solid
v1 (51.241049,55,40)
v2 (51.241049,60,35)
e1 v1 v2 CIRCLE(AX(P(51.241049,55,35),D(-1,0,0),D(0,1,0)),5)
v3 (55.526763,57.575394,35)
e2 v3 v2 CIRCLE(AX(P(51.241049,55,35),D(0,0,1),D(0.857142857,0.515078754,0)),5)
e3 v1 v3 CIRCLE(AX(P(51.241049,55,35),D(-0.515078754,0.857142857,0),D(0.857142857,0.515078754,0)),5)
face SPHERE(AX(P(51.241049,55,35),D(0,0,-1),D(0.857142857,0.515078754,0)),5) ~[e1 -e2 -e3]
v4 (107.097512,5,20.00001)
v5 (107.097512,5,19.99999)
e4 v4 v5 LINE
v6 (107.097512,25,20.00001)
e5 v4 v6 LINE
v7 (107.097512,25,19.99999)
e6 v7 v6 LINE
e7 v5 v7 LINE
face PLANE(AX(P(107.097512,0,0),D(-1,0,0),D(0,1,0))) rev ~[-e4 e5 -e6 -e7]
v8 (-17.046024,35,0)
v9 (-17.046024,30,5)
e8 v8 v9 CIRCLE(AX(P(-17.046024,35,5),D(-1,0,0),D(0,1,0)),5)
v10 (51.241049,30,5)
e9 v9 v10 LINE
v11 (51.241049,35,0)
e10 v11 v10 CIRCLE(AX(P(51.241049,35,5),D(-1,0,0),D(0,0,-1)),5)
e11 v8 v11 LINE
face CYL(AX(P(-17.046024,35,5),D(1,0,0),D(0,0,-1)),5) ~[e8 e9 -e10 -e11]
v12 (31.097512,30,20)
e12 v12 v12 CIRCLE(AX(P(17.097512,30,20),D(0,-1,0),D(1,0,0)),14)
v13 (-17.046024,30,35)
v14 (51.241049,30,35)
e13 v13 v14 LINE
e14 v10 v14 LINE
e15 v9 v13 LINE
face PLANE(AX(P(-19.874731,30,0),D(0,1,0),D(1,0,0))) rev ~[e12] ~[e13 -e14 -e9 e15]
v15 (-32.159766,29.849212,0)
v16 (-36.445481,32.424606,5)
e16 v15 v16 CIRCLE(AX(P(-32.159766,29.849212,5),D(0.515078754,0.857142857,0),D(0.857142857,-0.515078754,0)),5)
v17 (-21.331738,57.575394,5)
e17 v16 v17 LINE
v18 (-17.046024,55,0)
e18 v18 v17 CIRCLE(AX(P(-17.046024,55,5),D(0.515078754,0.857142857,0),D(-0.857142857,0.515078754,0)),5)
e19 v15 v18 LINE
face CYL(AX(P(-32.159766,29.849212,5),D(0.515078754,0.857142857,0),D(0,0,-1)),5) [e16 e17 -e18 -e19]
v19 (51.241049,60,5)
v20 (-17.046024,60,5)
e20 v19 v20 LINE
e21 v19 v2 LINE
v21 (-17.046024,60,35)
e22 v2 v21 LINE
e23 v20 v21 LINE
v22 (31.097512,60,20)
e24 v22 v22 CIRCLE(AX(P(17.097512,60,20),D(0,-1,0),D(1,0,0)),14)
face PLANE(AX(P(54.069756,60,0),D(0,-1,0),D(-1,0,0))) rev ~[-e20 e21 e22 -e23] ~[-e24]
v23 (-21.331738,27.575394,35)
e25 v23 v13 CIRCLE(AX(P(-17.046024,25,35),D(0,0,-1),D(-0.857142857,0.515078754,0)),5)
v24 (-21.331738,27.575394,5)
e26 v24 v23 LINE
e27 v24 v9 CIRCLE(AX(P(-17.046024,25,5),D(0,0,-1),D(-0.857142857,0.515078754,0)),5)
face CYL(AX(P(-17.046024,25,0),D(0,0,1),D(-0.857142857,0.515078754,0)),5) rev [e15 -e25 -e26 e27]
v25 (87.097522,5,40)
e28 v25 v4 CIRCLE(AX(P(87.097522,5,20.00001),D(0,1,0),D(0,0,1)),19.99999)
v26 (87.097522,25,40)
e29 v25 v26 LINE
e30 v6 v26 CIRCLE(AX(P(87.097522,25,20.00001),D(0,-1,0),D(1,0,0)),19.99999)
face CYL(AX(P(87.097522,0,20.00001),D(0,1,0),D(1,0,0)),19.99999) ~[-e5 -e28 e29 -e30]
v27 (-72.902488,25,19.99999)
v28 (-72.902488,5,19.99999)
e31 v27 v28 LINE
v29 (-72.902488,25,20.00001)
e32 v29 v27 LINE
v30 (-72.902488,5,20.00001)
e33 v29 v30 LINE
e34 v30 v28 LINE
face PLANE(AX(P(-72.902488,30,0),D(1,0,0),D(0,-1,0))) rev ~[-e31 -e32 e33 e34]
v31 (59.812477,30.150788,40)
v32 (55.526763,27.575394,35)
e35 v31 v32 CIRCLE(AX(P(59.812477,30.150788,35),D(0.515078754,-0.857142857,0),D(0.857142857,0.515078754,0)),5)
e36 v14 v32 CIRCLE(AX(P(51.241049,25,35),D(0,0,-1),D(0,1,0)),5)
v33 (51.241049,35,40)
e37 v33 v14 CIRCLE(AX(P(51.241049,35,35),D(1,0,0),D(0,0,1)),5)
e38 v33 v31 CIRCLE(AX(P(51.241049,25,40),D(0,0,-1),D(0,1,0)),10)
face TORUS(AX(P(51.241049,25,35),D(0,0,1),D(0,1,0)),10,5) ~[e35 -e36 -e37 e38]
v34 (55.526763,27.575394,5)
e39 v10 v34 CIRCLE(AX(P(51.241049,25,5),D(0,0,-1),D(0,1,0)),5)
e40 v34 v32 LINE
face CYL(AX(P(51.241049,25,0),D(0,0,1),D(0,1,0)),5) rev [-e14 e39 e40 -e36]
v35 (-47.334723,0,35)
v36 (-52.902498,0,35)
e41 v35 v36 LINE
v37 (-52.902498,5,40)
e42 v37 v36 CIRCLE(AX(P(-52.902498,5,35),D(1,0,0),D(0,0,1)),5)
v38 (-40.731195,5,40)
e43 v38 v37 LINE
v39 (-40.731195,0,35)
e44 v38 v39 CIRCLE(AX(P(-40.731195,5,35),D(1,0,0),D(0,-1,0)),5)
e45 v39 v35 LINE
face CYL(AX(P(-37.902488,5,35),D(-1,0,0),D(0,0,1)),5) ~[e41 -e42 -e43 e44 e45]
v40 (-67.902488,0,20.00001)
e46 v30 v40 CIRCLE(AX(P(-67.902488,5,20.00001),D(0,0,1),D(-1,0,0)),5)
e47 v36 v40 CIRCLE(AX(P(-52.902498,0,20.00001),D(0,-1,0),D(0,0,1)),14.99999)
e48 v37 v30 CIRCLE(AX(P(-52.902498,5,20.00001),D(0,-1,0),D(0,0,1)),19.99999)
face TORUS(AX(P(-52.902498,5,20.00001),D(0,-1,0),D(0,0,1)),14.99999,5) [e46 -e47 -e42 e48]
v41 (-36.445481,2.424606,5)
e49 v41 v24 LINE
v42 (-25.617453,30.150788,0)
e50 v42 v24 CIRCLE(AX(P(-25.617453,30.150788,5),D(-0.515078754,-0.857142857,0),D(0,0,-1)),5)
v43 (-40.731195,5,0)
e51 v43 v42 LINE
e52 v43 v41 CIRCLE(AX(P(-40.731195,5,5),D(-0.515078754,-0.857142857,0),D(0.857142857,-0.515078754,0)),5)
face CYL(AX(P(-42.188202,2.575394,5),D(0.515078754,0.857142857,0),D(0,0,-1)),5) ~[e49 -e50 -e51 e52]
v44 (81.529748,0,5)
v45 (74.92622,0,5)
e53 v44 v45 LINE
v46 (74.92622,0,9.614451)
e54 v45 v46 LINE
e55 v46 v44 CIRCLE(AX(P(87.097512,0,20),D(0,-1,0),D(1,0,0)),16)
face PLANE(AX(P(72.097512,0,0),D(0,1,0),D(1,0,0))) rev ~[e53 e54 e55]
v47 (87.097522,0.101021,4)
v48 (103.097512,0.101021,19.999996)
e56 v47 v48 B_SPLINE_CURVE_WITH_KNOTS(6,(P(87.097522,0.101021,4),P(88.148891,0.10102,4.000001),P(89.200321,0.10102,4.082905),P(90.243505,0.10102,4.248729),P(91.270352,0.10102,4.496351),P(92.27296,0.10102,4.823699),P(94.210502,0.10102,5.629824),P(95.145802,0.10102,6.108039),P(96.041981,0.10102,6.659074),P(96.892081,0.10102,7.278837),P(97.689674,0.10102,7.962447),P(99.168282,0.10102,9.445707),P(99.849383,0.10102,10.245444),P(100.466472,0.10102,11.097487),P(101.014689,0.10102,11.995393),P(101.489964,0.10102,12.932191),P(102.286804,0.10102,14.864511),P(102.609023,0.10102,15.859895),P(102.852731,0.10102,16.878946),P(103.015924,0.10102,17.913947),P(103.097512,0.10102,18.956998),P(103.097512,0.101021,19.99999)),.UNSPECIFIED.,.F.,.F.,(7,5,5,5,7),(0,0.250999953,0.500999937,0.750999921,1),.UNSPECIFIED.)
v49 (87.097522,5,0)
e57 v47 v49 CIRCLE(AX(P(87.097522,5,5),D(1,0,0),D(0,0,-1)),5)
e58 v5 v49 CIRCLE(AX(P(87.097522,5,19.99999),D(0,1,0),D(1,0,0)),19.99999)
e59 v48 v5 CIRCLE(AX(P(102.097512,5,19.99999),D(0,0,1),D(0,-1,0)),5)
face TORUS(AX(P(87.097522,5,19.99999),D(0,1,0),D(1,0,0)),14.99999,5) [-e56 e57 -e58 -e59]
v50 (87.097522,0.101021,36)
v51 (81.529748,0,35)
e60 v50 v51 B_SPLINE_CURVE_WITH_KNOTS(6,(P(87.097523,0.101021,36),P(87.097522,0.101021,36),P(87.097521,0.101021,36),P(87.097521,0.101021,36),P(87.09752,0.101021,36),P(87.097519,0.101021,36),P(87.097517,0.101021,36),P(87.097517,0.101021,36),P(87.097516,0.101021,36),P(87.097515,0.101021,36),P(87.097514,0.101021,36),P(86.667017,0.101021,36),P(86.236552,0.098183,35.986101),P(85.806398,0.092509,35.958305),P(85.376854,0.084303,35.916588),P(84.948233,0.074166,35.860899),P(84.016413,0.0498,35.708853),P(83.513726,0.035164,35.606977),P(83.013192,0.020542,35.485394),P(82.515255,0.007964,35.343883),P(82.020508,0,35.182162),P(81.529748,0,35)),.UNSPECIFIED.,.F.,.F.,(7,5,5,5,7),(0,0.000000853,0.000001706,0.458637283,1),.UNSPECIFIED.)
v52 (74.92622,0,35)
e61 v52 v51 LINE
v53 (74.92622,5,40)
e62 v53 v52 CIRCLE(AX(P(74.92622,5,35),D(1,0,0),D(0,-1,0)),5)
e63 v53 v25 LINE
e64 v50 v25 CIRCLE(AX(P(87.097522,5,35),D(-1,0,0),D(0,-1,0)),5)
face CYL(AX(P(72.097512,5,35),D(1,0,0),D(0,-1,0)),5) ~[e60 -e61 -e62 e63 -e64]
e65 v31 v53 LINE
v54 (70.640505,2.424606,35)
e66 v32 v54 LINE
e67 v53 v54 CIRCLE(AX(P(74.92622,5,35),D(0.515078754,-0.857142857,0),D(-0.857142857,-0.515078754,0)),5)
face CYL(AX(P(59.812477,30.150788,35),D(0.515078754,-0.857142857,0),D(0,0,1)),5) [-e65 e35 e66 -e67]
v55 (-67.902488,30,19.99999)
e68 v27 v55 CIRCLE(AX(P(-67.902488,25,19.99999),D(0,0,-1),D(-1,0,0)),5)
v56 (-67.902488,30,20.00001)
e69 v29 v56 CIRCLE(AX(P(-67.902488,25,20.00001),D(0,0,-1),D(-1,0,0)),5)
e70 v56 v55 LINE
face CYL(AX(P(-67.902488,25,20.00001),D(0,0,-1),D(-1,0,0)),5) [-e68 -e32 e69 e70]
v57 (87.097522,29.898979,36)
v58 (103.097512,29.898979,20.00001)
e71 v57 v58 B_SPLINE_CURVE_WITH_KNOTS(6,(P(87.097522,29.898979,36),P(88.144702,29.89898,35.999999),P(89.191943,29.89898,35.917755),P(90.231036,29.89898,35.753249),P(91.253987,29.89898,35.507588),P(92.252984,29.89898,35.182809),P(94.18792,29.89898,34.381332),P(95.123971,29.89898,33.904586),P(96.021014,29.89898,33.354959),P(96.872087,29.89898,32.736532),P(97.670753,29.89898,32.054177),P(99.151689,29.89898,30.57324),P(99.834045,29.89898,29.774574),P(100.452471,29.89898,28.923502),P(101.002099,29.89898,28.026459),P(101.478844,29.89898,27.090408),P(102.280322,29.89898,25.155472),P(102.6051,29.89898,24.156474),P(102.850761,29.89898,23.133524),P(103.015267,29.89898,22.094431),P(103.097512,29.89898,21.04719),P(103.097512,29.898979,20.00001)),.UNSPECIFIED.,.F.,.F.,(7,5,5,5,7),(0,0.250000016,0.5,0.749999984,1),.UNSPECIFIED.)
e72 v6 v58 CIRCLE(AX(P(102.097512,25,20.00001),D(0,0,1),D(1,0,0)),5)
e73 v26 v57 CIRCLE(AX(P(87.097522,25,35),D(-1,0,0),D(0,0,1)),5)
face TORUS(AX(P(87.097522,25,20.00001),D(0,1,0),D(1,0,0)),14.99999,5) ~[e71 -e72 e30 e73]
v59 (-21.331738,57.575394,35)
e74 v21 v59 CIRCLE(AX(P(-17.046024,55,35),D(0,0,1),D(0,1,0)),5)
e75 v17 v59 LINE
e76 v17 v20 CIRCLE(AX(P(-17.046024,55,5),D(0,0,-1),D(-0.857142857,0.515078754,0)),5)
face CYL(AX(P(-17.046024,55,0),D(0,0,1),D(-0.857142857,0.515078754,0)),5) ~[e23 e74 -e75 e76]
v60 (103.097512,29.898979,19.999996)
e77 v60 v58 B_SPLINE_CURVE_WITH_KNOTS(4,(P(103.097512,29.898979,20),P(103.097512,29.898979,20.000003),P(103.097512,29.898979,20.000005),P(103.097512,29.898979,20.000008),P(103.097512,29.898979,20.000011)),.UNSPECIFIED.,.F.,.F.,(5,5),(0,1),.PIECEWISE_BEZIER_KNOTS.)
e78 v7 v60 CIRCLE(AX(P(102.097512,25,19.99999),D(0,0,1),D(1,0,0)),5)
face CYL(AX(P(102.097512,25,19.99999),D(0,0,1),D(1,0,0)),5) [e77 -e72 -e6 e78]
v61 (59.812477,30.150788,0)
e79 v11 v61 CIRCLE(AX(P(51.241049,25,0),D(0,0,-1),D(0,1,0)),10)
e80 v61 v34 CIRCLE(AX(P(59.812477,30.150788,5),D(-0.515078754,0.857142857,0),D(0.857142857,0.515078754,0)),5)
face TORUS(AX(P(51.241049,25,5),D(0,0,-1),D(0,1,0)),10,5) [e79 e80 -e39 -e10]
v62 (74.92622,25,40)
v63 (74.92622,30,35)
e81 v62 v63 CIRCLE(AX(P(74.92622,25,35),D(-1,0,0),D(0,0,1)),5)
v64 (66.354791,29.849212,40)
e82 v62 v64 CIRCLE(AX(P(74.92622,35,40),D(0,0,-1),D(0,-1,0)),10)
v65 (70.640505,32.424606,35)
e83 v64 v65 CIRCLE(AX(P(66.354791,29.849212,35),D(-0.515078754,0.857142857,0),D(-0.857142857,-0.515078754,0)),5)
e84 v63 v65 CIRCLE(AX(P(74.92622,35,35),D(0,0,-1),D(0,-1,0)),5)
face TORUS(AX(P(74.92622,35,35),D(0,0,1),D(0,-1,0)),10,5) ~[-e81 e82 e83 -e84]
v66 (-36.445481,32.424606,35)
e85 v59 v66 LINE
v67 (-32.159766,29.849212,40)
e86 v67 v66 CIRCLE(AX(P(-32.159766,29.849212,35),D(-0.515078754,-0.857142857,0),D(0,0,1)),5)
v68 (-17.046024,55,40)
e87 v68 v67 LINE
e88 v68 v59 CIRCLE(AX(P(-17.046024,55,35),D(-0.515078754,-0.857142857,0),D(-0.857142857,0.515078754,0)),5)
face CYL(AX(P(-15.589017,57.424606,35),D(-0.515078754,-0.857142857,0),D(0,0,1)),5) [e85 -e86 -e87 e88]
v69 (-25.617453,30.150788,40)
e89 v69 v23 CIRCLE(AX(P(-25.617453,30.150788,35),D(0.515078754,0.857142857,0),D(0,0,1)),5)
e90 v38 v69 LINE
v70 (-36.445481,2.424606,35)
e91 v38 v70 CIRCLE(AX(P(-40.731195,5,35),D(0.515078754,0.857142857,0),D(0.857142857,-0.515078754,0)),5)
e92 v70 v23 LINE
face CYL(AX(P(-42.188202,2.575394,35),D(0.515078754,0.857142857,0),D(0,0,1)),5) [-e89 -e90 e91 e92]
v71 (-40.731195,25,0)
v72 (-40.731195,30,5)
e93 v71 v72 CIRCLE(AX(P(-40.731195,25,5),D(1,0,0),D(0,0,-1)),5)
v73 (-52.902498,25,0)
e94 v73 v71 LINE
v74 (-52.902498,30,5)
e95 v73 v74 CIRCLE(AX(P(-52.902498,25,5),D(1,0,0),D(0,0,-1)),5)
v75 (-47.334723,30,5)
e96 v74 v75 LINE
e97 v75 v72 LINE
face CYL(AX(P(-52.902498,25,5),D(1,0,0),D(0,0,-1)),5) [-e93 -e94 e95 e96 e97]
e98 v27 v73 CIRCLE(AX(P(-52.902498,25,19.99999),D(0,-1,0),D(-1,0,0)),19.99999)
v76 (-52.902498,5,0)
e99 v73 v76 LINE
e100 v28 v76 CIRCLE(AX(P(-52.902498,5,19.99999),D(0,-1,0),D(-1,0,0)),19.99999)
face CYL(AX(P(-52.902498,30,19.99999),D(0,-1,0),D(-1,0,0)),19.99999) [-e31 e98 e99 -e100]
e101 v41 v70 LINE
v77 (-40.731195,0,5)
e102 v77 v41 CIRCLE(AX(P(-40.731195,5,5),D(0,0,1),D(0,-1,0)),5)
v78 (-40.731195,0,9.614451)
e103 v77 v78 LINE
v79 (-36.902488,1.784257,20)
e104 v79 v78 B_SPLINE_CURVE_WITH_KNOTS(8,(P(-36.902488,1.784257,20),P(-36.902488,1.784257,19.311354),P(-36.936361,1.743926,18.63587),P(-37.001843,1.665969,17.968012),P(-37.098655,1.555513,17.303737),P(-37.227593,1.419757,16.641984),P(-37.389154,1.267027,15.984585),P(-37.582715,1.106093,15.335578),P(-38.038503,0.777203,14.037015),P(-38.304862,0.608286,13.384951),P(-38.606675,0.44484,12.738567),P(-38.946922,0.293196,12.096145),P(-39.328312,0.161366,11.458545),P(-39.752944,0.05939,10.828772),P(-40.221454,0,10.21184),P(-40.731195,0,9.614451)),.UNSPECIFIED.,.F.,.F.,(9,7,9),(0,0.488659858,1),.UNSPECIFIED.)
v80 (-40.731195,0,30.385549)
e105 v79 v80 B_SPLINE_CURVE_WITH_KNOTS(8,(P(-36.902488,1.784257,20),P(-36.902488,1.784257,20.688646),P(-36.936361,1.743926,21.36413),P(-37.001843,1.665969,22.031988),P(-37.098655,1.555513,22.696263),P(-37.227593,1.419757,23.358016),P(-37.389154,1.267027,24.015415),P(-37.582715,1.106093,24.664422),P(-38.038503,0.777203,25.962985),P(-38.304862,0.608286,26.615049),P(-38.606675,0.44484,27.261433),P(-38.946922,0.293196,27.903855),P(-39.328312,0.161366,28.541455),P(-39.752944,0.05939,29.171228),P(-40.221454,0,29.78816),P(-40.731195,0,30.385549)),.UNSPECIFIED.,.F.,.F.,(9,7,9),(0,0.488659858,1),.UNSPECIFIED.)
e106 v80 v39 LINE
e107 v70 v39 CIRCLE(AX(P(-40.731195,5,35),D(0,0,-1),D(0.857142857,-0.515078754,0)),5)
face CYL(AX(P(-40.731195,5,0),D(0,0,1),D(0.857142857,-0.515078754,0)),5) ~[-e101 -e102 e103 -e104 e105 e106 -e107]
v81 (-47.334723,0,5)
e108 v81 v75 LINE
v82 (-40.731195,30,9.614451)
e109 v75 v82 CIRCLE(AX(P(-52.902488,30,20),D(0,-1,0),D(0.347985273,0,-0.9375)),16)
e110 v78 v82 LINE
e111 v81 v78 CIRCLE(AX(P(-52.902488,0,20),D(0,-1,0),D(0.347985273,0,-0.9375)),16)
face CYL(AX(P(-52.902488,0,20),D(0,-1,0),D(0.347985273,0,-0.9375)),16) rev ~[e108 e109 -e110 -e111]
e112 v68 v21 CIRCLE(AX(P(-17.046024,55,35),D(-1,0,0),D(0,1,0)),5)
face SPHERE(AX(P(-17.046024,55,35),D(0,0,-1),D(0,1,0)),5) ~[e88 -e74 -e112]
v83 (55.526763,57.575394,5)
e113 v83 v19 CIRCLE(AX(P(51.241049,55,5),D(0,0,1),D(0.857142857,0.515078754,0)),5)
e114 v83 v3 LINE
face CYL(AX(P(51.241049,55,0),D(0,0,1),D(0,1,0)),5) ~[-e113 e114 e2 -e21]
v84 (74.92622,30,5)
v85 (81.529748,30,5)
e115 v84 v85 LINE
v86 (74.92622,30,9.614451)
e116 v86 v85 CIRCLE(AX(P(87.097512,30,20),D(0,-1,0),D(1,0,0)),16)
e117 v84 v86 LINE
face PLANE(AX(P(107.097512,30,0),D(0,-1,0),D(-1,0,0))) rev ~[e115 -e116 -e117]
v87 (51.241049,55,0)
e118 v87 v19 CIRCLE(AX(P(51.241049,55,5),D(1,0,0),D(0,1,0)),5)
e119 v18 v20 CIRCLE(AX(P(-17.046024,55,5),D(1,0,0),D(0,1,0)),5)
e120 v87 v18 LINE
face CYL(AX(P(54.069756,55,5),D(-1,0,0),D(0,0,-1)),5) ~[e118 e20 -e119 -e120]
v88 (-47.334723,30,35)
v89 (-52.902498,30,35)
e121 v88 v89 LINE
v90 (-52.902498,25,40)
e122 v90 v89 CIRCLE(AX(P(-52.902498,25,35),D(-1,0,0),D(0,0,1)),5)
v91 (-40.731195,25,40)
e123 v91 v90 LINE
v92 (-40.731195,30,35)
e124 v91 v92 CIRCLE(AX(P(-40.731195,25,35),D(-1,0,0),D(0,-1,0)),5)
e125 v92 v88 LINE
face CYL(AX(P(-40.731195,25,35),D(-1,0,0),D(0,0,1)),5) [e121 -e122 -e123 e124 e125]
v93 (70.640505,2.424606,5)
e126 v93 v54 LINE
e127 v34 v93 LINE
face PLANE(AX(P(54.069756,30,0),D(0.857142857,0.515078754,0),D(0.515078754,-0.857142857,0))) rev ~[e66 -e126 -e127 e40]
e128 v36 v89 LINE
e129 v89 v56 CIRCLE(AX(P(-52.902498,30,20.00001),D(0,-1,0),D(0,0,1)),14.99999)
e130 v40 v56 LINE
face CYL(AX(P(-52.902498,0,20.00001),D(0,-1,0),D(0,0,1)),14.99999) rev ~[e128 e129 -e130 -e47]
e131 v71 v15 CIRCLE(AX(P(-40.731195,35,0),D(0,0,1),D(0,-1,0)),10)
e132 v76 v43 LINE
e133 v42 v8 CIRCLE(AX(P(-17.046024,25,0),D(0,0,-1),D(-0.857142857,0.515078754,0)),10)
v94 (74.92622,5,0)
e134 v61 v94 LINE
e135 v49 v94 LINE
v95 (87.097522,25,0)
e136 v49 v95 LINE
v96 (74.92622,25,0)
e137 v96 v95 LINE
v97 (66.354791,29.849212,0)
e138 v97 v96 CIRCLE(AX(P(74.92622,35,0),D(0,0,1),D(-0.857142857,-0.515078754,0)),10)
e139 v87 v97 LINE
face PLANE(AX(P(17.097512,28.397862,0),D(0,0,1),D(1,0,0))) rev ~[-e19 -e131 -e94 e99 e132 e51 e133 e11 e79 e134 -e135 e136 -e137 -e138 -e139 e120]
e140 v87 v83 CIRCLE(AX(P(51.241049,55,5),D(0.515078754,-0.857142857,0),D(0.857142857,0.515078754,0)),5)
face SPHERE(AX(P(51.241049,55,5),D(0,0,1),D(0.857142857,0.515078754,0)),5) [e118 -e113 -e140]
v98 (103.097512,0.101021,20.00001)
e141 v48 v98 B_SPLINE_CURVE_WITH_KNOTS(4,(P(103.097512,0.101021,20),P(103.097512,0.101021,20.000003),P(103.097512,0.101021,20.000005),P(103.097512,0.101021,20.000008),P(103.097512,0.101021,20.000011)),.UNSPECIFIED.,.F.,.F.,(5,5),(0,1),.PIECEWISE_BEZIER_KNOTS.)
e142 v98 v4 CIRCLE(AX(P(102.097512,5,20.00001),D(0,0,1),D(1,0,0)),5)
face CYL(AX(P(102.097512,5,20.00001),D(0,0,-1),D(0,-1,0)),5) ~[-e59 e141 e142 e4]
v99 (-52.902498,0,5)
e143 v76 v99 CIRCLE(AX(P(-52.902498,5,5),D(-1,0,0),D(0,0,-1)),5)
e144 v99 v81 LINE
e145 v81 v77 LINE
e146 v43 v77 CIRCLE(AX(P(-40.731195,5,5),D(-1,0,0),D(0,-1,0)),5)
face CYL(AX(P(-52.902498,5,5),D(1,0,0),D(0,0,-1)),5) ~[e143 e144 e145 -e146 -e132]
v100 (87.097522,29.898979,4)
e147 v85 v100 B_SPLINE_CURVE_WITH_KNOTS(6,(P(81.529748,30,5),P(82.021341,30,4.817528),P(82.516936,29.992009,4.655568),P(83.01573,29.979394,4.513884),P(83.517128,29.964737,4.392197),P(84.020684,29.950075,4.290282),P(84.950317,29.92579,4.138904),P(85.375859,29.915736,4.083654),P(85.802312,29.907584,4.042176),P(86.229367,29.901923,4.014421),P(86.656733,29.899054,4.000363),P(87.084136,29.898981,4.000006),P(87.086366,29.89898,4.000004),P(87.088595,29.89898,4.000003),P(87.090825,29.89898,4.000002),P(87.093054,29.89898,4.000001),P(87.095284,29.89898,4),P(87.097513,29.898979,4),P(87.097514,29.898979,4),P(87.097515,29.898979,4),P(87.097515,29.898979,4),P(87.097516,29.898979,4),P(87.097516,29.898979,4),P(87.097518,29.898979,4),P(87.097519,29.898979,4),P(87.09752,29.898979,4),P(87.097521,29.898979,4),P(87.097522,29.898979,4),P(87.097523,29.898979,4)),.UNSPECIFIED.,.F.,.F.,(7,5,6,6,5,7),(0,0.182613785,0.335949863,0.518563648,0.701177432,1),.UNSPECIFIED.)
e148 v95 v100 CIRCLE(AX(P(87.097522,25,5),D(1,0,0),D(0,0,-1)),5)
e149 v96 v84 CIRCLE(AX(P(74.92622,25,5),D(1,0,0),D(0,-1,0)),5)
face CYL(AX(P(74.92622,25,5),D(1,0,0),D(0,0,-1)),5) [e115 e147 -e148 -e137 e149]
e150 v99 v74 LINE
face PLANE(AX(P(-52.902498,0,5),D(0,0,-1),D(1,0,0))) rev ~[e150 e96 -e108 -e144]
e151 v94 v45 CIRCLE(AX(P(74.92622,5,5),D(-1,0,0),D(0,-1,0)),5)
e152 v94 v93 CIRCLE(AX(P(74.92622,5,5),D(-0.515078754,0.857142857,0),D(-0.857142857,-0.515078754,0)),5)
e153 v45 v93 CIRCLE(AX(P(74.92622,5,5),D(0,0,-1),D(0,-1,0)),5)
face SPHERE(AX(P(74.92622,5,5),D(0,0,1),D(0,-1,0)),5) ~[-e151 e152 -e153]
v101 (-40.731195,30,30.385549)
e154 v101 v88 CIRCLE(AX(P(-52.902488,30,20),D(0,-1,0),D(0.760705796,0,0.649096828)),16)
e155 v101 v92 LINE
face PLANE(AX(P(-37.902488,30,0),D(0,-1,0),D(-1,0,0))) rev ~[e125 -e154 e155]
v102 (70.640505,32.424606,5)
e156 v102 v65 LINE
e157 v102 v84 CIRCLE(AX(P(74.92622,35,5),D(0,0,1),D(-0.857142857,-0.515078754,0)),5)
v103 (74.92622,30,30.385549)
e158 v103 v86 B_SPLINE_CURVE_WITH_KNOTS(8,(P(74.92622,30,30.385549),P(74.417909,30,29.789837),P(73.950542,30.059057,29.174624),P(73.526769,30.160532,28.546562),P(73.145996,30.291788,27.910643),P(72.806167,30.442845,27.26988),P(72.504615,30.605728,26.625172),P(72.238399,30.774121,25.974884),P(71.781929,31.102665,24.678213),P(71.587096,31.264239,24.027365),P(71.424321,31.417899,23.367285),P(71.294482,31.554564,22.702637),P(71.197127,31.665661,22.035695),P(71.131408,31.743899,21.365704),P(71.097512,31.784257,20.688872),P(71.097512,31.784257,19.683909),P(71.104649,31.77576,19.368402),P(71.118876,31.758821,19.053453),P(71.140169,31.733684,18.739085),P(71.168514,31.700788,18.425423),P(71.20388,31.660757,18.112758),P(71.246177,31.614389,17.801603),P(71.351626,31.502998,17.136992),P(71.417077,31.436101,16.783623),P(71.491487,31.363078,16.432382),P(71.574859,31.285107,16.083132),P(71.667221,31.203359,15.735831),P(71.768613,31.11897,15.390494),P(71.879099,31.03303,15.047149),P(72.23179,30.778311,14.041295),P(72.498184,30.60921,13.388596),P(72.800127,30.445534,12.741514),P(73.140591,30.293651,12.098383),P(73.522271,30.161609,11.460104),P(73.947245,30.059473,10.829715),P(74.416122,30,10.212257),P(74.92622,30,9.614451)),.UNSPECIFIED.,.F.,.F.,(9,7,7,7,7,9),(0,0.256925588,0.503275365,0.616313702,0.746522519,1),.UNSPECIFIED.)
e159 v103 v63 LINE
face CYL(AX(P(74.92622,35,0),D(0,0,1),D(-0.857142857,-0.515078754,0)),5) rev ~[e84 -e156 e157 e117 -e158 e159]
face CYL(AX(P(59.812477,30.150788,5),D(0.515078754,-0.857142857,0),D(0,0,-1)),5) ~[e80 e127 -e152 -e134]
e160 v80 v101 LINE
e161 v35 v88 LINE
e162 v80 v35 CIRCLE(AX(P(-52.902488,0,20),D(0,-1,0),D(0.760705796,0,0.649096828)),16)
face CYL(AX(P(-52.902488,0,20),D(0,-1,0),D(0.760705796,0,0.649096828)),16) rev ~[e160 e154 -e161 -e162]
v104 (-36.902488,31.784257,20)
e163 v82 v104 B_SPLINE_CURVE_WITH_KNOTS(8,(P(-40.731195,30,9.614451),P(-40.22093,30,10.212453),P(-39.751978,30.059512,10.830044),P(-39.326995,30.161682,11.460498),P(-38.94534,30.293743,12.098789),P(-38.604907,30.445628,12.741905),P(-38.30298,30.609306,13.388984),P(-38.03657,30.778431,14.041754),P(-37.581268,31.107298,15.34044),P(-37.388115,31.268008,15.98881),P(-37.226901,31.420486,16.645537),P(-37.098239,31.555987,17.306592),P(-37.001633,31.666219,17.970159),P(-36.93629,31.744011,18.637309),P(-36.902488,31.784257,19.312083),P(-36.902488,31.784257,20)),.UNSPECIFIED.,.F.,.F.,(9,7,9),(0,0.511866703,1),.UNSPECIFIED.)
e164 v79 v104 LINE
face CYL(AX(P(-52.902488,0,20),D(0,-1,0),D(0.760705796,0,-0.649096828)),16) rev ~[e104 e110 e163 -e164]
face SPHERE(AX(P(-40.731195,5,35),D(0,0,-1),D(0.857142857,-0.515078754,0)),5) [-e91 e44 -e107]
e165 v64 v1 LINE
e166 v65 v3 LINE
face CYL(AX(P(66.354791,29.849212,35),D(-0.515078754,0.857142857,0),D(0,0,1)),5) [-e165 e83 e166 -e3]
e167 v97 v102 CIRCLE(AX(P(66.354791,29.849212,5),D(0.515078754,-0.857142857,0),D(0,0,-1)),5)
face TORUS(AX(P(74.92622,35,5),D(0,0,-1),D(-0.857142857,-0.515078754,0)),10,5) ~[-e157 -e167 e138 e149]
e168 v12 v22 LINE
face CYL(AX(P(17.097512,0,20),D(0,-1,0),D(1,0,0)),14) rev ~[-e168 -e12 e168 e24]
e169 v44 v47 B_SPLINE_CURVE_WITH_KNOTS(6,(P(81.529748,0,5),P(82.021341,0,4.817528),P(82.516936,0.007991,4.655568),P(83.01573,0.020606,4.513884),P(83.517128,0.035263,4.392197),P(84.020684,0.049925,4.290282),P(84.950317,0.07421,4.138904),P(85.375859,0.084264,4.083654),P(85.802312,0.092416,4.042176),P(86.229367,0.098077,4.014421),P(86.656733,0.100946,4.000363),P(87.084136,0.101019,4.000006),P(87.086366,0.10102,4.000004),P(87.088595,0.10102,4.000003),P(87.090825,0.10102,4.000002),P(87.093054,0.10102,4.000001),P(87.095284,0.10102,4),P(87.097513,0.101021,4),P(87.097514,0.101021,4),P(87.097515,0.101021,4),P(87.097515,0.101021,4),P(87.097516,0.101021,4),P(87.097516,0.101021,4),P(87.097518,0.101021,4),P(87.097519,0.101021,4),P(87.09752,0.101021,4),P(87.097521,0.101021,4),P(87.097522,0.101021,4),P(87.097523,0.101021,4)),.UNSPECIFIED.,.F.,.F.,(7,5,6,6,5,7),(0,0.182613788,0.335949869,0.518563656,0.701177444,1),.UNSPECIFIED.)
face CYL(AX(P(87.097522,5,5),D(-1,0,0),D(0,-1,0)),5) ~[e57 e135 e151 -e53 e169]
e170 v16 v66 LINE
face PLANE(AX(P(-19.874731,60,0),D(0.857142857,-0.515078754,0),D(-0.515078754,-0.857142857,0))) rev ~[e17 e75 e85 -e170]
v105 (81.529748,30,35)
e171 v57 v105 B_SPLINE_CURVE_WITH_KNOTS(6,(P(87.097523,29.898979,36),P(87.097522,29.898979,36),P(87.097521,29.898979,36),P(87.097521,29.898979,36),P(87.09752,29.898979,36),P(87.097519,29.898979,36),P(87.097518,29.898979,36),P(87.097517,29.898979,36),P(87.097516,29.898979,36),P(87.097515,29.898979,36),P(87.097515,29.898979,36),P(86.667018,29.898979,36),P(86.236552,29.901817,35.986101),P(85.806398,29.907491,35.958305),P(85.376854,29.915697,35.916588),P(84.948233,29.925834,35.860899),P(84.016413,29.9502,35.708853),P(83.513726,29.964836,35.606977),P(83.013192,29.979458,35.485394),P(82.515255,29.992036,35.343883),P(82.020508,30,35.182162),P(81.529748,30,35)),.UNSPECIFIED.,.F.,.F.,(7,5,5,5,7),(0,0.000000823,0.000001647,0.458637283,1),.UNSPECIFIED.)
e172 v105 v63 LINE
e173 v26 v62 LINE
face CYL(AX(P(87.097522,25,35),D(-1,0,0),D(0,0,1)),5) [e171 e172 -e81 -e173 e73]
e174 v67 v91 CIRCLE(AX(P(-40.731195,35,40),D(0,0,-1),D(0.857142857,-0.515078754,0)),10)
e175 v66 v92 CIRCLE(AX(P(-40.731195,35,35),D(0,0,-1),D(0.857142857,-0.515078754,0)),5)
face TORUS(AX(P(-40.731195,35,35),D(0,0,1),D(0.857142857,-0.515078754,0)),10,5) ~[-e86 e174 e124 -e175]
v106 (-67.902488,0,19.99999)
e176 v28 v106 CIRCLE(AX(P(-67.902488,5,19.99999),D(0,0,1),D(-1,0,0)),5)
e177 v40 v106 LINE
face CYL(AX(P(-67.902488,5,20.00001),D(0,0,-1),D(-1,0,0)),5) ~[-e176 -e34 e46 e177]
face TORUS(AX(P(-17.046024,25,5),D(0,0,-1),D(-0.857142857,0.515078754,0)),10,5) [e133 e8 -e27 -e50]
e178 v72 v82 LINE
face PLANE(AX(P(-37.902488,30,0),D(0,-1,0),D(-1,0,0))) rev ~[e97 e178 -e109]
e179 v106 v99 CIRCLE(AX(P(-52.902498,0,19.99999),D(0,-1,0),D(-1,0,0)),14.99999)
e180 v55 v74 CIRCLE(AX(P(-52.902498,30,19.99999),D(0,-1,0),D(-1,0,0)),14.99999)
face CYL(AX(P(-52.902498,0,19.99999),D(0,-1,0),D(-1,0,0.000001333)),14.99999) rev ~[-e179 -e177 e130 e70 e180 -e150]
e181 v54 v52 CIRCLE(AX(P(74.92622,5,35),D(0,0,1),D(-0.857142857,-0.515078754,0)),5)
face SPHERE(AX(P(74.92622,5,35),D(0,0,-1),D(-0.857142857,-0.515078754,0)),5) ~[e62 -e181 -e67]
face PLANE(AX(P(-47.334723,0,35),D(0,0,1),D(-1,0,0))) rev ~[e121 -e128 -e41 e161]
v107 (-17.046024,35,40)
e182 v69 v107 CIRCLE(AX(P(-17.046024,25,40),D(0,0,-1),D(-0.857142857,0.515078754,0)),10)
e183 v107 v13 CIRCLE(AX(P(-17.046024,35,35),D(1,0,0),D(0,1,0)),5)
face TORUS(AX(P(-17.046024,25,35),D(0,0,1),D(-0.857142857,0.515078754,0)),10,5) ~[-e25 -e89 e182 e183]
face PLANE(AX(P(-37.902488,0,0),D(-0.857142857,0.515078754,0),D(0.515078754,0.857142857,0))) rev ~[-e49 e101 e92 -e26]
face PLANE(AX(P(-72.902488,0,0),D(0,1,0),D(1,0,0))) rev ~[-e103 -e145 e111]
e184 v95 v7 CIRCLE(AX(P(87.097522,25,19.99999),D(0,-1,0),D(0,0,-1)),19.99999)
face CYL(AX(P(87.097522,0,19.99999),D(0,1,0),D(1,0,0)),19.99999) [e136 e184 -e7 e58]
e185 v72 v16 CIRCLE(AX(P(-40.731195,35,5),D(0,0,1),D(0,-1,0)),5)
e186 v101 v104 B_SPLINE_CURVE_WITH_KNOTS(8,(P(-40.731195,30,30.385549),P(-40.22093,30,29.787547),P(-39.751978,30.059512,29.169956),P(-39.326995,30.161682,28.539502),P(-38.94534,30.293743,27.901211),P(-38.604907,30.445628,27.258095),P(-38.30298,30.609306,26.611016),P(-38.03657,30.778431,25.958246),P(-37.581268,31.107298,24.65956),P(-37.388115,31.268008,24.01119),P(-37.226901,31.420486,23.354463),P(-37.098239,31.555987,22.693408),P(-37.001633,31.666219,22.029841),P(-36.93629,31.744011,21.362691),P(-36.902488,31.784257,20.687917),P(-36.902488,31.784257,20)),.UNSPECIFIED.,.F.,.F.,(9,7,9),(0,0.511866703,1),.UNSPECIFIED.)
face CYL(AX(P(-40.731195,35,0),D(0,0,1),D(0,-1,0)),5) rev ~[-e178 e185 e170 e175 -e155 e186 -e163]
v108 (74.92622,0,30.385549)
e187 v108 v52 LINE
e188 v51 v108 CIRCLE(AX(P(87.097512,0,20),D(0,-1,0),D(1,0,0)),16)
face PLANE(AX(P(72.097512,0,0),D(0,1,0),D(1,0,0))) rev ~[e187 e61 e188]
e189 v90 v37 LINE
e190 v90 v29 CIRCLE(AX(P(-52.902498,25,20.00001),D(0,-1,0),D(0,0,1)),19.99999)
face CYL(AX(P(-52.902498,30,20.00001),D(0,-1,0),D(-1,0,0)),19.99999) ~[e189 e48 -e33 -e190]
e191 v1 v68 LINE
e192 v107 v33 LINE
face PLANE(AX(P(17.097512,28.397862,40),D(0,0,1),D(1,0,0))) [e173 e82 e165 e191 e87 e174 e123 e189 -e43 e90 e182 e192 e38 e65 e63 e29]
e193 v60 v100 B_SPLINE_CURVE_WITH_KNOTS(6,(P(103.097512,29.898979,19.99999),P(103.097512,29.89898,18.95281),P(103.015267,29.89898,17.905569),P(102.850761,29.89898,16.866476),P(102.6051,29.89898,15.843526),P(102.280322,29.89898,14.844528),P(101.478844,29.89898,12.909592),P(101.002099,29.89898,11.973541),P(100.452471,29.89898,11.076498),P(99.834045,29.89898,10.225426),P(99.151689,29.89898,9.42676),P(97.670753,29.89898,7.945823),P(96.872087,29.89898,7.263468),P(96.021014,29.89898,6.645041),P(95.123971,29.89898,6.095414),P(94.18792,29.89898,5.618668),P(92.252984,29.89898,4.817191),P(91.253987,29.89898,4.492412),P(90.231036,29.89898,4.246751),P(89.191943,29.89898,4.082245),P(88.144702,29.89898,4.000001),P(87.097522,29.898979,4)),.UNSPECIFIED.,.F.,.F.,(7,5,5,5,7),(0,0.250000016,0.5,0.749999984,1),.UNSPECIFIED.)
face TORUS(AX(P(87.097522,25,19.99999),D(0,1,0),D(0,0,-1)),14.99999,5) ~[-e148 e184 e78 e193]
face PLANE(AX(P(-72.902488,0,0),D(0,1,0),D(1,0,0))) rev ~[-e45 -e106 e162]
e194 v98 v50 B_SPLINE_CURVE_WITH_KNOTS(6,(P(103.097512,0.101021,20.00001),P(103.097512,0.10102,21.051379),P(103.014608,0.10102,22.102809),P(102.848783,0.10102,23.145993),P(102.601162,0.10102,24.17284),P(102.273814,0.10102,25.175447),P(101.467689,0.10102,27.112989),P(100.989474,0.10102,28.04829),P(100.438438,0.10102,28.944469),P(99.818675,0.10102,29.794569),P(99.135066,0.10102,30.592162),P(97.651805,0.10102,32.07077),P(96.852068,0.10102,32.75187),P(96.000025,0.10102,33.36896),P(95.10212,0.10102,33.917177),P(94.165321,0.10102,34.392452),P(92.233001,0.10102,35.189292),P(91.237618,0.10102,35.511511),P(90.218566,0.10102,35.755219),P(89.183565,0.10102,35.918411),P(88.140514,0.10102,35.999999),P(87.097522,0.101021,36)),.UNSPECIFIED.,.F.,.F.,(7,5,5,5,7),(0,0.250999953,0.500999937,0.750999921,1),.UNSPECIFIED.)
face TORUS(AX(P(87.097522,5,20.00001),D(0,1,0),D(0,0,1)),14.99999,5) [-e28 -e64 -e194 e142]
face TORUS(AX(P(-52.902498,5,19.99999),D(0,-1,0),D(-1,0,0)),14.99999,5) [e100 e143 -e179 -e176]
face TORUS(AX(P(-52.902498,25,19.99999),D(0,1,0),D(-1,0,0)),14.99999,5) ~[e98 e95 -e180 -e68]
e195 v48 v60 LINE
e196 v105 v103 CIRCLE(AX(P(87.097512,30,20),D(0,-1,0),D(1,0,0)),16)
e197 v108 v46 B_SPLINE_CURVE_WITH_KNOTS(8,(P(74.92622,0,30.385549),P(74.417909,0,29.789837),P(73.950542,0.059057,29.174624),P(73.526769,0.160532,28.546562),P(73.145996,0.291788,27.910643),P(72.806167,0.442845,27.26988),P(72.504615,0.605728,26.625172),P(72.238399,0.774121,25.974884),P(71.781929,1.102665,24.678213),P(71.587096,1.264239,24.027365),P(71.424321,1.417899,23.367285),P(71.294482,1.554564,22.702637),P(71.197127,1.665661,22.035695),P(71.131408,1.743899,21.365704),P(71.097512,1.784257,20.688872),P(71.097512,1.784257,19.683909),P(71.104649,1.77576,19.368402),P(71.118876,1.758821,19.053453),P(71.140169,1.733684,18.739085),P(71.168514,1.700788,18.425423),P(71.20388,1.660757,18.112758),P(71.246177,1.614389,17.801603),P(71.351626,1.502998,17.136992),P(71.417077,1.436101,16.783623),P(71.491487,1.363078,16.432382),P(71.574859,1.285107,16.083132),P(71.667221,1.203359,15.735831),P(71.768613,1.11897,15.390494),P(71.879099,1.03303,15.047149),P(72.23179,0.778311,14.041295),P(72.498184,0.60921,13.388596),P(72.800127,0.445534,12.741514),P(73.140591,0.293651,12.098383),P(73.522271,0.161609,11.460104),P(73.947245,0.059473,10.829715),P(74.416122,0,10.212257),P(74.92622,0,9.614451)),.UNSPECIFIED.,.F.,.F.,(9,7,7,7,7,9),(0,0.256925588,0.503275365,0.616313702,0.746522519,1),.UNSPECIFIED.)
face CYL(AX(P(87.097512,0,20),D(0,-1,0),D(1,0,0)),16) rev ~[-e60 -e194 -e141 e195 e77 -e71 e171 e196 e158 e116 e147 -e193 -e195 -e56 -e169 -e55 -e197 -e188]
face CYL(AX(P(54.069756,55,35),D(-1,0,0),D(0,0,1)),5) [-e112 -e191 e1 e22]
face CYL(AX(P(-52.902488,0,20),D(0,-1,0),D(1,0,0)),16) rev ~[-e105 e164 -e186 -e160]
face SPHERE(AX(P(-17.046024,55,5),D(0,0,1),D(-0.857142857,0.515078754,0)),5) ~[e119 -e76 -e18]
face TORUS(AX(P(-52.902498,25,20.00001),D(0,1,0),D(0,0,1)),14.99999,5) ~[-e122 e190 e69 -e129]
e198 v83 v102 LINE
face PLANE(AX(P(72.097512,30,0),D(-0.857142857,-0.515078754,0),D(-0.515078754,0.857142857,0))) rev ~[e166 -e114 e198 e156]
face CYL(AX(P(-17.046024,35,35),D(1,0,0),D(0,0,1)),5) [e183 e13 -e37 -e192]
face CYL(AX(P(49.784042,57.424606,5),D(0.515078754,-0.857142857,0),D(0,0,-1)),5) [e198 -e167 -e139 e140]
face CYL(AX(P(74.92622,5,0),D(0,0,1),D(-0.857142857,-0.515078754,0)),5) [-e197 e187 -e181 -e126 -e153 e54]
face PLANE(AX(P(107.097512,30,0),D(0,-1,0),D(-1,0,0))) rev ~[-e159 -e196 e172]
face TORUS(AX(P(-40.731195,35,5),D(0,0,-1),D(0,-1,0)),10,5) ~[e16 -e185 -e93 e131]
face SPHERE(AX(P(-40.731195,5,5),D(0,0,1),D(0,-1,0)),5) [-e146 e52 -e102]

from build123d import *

# Parameters (mm, degrees)
F1_DEPTH = 40
F2_R     = 19.99999
F3_F1_R  = 5
F3_F2_R  = 5
F4_R     = 16
F4_R_2   = 14
F5_DEPTH = 66.5


# Not quite as in the source:
# - a fillet or chamfer is up to 0.001 mm smaller than in the source, because OpenCascade refuses the exact size
# - ends of sketch curves that miss each other by under 0.0002 mm in the source are joined


with BuildPart() as f1:
    # F0 (on Top) → F1 (new body)
    with BuildSketch(Plane.XY):
        Polygon((-72.9024875954, 30), (-72.9024875954, 0), (-37.9024875954, 0), (-19.8747312181, 30), (17.0975124046, 30), (54.0697560273, 30), (72.0975124046, 0), (107.0975124046, 0), (107.0975124046, 30), (72.0975124046, 30), (54.0697560273, 60), (17.0975124046, 60), (-19.8747312181, 60), (-37.9024875954, 30), align=None)
    extrude(amount=F1_DEPTH)

    # F2 (radius 20 in the source; OpenCascade refuses exactly that, so slightly less here)
    f2_edges = [f1.edges().sort_by_distance(p)[0] for p in [
        (-72.902488, 15, 40),
        (-72.902488, 15, 0),
        (107.097512, 15, 40),
        (107.097512, 15, 0),
    ]]
    fillet(f2_edges, radius=F2_R)

    # F3: fillet of radius 5 on 16 edges, made by hand

    # F3_f1
    f3_f1_edges = [f1.edges().sort_by_distance(p)[0] for p in [
        (-19.8747312181, 30, 20),
        (54.0697560273, 30, 20),
        (72.0975124046, 30, 20),
        (-37.9024875954, 30, 20),
    ]]
    fillet(f3_f1_edges, radius=F3_F1_R)

    # F3_f2
    f3_f2_edges = [f1.edges().sort_by_distance(p)[0] for p in [
        (-37.9024875954, 0, 20),
        (72.0975124046, 0, 20),
        (54.0697560273, 60, 20),
        (-19.8747312181, 60, 20),
        (62.3551307083, 46.2123031159, 40),
        (17.0975124046, 60, 40),
        (-28.1601058991, 46.2123031159, 40),
        (63.8121377235, 13.7876968841, 40),
        (101.2396509572, 0, 5.8578614473),
        (-67.0446261481, 0, 5.8578614473),
        (17.0975124046, 30, 0),
        (17.0975124046, 60, 0),
        (-72.9024875954, 0, 20),
        (-45.4024925954, 0, 0),
        (-67.0446261481, 0, 34.1421385527),
        (-45.4024925954, 0, 40),
        (107.0975124046, 0, 20),
        (79.5975174046, 0, 0),
        (101.2396509572, 0, 34.1421385527),
        (79.5975174046, 0, 40),
        (-19.5080384845, 29.3518369019, 0),
        (53.7030632936, 29.3518369019, 0),
        (53.7030632936, 29.3518369019, 40),
        (-38.269180329, 30.6481630981, 40),
        (72.4642051382, 30.6481630981, 40),
    ]]
    fillet(f3_f2_edges, radius=F3_F2_R)

    # F4 (on face) → F5 (cut)
    with BuildSketch(Plane.XZ):
        with BuildLine():
            Line((-40.7311948659, 9.6144507468), (-40.7311948659, 30.3855492532))
            ThreePointArc((-40.7311948659, 30.3855492532), (-43.7377821689, 33.1151886927), (-47.3347232326, 35))
            Line((-47.3347232326, 35), (-52.9024975954, 35))
            ThreePointArc((-52.9024975954, 35), (-63.5090922422, 30.6066046467), (-67.9024875954, 20.00001))
            ThreePointArc((-67.9024875954, 20.00001), (-63.5090922422, 9.3933953533), (-52.9024975954, 5))
            Line((-52.9024975954, 5), (-47.3347232326, 5))
            ThreePointArc((-47.3347232326, 5), (-43.7377821689, 6.8848113073), (-40.7311948659, 9.6144507468))
        make_face()
        with Locations((87.0975124046, 20)):
            Circle(F4_R)
        with BuildLine():
            ThreePointArc((-40.7311948659, 9.6144507468), (-37.8901479431, 14.4655932419), (-36.9024875954, 20))
            ThreePointArc((-36.9024875954, 20), (-37.8901479431, 25.5344067581), (-40.7311948659, 30.3855492532))
            Line((-40.7311948659, 30.3855492532), (-40.7311948659, 9.6144507468))
        make_face()
        with Locations((17.0975124046, 20)):
            Circle(F4_R_2)
    extrude(amount=-F5_DEPTH, mode=Mode.SUBTRACT)


solid = f1.part
